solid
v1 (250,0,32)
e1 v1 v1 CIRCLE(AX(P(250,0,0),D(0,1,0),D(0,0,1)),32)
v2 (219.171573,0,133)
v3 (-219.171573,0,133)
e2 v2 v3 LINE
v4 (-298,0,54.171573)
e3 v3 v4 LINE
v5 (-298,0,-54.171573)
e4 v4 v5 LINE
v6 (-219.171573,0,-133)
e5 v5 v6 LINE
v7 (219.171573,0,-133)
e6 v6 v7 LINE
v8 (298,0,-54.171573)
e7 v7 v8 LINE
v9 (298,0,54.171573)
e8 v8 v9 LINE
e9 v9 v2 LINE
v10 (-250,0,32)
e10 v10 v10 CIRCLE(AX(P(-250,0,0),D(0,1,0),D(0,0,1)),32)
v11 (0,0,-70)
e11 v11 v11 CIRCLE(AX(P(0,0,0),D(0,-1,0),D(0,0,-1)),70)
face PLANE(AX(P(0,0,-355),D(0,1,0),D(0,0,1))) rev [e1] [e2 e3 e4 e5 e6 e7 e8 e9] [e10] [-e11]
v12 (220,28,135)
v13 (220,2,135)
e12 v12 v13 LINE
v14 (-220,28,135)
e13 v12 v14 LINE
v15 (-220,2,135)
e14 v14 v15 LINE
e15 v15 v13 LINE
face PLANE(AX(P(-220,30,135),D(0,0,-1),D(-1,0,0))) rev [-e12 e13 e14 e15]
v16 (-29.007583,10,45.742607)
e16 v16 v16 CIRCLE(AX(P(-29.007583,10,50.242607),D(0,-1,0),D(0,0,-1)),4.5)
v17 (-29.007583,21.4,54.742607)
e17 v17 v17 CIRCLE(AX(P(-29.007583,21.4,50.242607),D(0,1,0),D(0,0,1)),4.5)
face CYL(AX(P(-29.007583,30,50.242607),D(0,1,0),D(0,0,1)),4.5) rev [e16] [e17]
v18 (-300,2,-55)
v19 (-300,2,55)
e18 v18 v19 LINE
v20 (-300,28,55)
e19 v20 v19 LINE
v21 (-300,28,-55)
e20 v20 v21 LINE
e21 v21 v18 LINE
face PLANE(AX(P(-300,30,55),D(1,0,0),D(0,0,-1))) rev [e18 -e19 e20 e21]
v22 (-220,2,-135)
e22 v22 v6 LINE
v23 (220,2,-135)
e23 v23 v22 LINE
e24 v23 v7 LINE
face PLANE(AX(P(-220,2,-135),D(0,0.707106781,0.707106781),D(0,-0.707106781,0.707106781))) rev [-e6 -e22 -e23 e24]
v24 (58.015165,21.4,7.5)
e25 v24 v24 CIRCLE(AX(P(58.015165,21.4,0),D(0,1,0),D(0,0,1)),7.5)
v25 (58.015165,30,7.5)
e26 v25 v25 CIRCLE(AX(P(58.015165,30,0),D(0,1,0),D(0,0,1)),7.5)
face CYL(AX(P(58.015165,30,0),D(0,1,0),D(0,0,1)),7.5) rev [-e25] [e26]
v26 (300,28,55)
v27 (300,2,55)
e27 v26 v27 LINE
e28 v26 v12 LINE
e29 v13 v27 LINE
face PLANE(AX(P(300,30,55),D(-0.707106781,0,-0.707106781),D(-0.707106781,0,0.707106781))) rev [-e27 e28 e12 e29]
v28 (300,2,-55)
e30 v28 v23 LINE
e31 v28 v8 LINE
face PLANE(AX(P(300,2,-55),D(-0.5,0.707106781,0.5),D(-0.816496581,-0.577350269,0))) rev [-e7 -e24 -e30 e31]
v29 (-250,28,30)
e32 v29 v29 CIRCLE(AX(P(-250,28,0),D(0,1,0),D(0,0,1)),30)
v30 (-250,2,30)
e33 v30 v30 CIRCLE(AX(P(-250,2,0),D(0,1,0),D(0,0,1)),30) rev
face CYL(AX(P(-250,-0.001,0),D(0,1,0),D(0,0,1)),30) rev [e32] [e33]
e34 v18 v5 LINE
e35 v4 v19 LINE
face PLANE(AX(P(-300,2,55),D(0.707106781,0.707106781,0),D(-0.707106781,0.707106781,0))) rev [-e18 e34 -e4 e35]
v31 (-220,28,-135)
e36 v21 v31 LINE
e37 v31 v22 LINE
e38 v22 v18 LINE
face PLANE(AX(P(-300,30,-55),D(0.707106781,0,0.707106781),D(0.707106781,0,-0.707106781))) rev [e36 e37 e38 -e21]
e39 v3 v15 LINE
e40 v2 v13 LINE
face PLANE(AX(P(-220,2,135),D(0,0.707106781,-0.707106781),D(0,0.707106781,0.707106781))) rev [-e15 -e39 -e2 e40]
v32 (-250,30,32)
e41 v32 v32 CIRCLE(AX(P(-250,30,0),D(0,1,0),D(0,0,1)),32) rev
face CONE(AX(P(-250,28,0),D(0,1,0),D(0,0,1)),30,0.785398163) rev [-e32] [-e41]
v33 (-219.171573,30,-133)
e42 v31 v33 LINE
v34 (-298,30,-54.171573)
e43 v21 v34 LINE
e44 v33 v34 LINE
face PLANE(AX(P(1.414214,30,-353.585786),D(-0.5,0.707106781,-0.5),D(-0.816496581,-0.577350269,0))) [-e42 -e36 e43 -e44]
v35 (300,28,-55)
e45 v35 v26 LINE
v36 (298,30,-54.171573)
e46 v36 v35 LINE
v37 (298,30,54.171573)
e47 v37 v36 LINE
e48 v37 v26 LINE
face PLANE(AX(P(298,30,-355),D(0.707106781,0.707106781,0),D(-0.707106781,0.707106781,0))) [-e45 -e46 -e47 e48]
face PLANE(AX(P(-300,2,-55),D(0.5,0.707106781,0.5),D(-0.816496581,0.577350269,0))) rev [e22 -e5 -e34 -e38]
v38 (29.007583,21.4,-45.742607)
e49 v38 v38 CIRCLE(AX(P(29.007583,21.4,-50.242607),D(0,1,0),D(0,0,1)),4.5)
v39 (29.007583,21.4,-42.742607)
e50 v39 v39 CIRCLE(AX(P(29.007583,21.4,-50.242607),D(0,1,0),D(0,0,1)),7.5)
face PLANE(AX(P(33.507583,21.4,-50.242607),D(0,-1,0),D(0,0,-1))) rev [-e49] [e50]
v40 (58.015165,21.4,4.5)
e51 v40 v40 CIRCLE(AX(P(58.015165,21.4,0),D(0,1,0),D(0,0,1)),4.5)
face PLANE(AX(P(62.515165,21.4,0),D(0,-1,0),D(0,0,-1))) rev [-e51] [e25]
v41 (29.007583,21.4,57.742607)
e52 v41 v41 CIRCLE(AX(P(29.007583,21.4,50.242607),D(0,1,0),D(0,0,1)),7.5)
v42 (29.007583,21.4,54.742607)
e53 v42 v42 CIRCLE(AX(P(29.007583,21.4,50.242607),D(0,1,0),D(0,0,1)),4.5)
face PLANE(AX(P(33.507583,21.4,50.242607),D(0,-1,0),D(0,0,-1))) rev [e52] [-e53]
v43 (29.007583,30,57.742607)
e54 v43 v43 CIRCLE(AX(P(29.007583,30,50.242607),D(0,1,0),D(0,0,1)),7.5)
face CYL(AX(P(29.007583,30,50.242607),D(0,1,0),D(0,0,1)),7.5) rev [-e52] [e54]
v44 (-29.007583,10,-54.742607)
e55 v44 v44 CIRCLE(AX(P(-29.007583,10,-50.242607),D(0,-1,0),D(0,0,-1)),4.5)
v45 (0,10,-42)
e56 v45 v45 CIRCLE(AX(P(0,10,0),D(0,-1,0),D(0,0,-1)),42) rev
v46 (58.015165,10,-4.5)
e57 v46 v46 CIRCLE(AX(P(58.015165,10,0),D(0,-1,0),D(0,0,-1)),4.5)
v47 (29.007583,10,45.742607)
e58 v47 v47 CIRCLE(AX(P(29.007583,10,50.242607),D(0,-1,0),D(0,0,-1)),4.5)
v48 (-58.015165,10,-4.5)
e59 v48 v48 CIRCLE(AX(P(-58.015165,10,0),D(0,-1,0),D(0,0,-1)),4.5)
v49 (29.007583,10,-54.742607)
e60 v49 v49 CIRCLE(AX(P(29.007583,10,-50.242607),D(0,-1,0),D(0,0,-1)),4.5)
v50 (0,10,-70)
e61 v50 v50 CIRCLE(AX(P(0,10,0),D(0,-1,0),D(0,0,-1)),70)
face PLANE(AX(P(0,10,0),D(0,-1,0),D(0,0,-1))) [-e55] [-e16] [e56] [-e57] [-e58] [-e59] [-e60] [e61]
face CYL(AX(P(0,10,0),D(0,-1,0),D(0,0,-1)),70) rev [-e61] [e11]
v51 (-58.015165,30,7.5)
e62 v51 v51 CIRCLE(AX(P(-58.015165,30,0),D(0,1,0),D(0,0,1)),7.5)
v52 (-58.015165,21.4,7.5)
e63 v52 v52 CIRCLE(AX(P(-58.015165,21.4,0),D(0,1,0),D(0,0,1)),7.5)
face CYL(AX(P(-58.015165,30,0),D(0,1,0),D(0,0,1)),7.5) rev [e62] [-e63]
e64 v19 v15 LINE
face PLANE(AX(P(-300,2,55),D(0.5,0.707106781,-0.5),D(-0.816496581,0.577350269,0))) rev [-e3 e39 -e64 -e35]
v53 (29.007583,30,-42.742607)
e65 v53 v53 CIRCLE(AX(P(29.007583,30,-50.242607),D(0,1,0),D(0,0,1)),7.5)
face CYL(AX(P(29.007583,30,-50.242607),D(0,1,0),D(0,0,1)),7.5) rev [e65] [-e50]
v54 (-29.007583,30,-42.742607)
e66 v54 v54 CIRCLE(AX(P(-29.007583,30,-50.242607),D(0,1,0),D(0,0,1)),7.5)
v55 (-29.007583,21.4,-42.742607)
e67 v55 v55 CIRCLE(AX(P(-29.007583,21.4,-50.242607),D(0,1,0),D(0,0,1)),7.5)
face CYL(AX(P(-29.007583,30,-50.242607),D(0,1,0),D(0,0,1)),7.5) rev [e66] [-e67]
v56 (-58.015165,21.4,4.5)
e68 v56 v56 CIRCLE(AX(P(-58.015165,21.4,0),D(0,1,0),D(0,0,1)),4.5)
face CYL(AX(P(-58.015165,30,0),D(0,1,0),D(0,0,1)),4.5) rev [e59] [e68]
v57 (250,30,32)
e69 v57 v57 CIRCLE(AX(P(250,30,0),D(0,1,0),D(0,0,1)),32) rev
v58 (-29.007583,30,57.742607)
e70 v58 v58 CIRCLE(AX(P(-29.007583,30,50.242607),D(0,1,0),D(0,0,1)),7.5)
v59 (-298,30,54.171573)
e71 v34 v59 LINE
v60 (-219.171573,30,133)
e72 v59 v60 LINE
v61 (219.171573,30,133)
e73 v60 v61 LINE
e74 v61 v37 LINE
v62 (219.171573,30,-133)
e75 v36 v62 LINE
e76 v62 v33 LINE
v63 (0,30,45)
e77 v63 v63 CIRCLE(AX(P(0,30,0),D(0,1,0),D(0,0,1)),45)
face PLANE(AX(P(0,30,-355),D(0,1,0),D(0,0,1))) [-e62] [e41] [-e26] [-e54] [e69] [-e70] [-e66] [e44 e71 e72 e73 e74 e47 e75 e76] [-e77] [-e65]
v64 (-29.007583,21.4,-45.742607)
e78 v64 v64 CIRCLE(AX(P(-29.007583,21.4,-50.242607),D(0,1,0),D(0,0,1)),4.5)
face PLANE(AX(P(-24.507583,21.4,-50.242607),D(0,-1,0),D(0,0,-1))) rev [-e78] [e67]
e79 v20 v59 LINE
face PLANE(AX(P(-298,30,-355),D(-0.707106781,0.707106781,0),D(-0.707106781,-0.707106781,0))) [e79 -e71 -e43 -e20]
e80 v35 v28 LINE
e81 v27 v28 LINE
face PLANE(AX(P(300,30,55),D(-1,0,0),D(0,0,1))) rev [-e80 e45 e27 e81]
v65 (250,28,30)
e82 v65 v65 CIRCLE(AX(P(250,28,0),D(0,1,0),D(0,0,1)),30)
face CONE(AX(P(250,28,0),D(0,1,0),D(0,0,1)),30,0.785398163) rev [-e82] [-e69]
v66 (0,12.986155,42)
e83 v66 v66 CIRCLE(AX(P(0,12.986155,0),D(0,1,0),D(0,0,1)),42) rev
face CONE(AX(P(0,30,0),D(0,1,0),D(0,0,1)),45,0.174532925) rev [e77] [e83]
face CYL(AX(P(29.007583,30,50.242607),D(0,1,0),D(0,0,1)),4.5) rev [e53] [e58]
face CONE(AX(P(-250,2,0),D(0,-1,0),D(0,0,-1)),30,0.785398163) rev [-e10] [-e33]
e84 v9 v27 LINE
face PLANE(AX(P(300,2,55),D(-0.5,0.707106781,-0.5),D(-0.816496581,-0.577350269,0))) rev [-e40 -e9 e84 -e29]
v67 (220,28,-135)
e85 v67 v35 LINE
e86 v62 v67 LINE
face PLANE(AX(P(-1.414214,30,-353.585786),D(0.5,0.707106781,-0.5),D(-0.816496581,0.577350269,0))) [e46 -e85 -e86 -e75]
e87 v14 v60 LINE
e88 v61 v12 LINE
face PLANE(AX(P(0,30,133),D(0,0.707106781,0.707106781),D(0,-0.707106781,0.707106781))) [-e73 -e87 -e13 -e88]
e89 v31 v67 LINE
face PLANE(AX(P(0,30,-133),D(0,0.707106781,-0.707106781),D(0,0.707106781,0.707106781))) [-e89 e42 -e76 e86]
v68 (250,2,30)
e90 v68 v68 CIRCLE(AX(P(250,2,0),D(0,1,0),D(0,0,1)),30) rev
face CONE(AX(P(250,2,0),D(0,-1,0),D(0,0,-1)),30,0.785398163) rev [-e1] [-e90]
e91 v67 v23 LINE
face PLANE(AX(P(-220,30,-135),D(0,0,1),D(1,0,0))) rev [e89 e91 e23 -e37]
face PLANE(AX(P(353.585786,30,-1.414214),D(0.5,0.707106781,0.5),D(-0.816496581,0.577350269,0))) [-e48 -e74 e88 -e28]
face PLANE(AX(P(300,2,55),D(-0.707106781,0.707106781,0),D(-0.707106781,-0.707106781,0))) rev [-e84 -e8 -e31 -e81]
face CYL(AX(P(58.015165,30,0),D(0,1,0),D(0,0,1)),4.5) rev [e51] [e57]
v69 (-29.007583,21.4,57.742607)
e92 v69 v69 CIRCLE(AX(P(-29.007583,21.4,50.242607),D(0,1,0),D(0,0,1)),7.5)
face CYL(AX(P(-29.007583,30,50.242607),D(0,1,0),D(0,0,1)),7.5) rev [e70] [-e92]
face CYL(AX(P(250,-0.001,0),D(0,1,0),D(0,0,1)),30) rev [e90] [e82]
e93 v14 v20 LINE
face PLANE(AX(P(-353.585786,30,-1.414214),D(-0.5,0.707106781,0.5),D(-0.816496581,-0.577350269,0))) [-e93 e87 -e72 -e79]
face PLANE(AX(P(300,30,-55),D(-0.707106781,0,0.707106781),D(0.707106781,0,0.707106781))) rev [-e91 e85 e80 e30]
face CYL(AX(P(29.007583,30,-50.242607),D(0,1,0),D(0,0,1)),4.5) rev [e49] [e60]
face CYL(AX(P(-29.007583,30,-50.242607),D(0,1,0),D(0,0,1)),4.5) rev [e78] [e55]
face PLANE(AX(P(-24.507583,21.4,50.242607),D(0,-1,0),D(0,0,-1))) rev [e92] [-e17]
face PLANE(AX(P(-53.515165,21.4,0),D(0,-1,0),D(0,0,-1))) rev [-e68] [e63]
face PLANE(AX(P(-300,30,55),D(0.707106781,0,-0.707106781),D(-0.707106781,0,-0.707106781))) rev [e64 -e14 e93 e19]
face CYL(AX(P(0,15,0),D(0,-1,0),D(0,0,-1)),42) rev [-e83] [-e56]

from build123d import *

# Parameters (mm, degrees)
WYCI_GNI_CIE1_DEPTH                                 = 30
WYCI_GNI_CIE2_REACH                                 = 332.341
SZKIC3_R                                            = 30
SFAZOWANIE1_SIZE                                    = 2
OTW_R2_OUTLINE_R                                    = 42
OTW_R2_DEPTH                                        = 12.986154641
OTW_R3_OUTLINE_R                                    = 70
OTW_R3_OUTLINE_R_2                                  = 42
OTW_R3_DEPTH                                        = 10
POG_BIENIE_WALCOWE_POD_M8_WKR_T_Z_BEM_W_D           = 9
POG_BIENIE_WALCOWE_POD_M8_WKR_T_Z_BEM_W_CBORE_D     = 15
POG_BIENIE_WALCOWE_POD_M8_WKR_T_Z_BEM_W_CBORE_DEPTH = 8.6


# Read off the part's stored shape, not the designer's step: Otwór2, Otwór3
with BuildPart() as part:
    # Szkic1 → Wyciągnięcie1 (new body)
    with BuildSketch(Plane(origin=(0, 0, 0), x_dir=(1, 0, 0), z_dir=(0, 1, 0))):
        Polygon((-220, -135), (220, -135), (300, -55), (300, 55), (220, 135), (-220, 135), (-300, 55), (-300, -55), align=None)
    extrude(amount=WYCI_GNI_CIE1_DEPTH)

    # Szkic3 → Wyciągnięcie2 (cut, up to next)
    with BuildSketch(Plane(origin=(0, 30, 0), x_dir=(1, 0, 0), z_dir=(0, 1, 0)), mode=Mode.PRIVATE) as wyci_gni_cie2_sk1:
        with Locations(Location((-250, 0, 0), (0, 0, 270))):
            Circle(SZKIC3_R)
    wyci_gni_cie2_tool1 = extrude(wyci_gni_cie2_sk1.sketch, amount=-WYCI_GNI_CIE2_REACH, mode=Mode.PRIVATE) & part.part
    # Szkic3 → Wyciągnięcie2 (cut, up to next)
    with BuildSketch(Plane(origin=(0, 30, 0), x_dir=(1, 0, 0), z_dir=(0, 1, 0)), mode=Mode.PRIVATE) as wyci_gni_cie2_sk2:
        with Locations(Location((250, 0, 0), (0, 0, 270))):
            Circle(SZKIC3_R)
    wyci_gni_cie2_tool2 = extrude(wyci_gni_cie2_sk2.sketch, amount=-WYCI_GNI_CIE2_REACH, mode=Mode.PRIVATE) & part.part
    add(wyci_gni_cie2_tool1.solids().sort_by_distance((-250, 30, 0))[0], mode=Mode.SUBTRACT)
    add(wyci_gni_cie2_tool2.solids().sort_by_distance((250, 30, 0))[0], mode=Mode.SUBTRACT)

    # Sfazowanie1
    sfazowanie1_edges = [part.edges().sort_by_distance(p)[0] for p in [
        (-260, 30, 95),
        (-300, 0, 0),
        (-260, 0, -95),
        (0, 30, 135),
        (260, 30, 95),
        (300, 30, 0),
        (260, 30, -95),
        (-250, 30, -30),
        (-250, 0, -30),
        (0, 30, -135),
        (250, 30, -30),
        (250, 0, -30),
        (-260, 30, -95),
        (-300, 30, 0),
        (0, 0, -135),
        (260, 0, -95),
        (300, 0, 0),
        (260, 0, 95),
        (0, 0, 135),
        (-260, 0, 95),
    ]]
    chamfer(sfazowanie1_edges, length=SFAZOWANIE1_SIZE)

    # Szkic6 → Otwór1 (revolve, cut)
    with BuildSketch(Plane(origin=(0, 30, 0), x_dir=(0, 0, 1), z_dir=(1, 0, 0))):
        Polygon((0, 0), (0, 30), (10, 30), (10, 198.494863687), (45, 0), align=None)
    revolve(axis=Axis((0, 36.445314094, 0), (0, -1, 0)), mode=Mode.SUBTRACT)

    # Otwór2 outline → Otwór2 (cut)
    with BuildSketch(Plane(origin=(0, 0, 0), x_dir=(1, 0, 0), z_dir=(0, 1, 0))):
        Circle(OTW_R2_OUTLINE_R)
    extrude(amount=OTW_R2_DEPTH, mode=Mode.SUBTRACT)

    # Otwór3 outline → Otwór3 (cut)
    with BuildSketch(Plane(origin=(0, 0, 0), x_dir=(1, 0, 0), z_dir=(0, 1, 0))):
        Circle(OTW_R3_OUTLINE_R)
        Circle(OTW_R3_OUTLINE_R_2, mode=Mode.SUBTRACT)
    extrude(amount=OTW_R3_DEPTH, mode=Mode.SUBTRACT)

    # Pogłębienie walcowe pod M8 Wkręt z łbem walcowym z gniazdem sześciokątnym1 (through all)
    with Locations(Plane(origin=(0, 30, 0), x_dir=(1, 0, 0), z_dir=(0, 1, 0))):
        with Locations((-58.015165068, 0), (-29.007582534, 50.242606754), (29.007582534, 50.242606754), (58.015165068, 0), (29.007582534, -50.242606754), (-29.007582534, -50.242606754)):
            CounterBoreHole(POG_BIENIE_WALCOWE_POD_M8_WKR_T_Z_BEM_W_D / 2, POG_BIENIE_WALCOWE_POD_M8_WKR_T_Z_BEM_W_CBORE_D / 2, POG_BIENIE_WALCOWE_POD_M8_WKR_T_Z_BEM_W_CBORE_DEPTH)


solid = part.part
